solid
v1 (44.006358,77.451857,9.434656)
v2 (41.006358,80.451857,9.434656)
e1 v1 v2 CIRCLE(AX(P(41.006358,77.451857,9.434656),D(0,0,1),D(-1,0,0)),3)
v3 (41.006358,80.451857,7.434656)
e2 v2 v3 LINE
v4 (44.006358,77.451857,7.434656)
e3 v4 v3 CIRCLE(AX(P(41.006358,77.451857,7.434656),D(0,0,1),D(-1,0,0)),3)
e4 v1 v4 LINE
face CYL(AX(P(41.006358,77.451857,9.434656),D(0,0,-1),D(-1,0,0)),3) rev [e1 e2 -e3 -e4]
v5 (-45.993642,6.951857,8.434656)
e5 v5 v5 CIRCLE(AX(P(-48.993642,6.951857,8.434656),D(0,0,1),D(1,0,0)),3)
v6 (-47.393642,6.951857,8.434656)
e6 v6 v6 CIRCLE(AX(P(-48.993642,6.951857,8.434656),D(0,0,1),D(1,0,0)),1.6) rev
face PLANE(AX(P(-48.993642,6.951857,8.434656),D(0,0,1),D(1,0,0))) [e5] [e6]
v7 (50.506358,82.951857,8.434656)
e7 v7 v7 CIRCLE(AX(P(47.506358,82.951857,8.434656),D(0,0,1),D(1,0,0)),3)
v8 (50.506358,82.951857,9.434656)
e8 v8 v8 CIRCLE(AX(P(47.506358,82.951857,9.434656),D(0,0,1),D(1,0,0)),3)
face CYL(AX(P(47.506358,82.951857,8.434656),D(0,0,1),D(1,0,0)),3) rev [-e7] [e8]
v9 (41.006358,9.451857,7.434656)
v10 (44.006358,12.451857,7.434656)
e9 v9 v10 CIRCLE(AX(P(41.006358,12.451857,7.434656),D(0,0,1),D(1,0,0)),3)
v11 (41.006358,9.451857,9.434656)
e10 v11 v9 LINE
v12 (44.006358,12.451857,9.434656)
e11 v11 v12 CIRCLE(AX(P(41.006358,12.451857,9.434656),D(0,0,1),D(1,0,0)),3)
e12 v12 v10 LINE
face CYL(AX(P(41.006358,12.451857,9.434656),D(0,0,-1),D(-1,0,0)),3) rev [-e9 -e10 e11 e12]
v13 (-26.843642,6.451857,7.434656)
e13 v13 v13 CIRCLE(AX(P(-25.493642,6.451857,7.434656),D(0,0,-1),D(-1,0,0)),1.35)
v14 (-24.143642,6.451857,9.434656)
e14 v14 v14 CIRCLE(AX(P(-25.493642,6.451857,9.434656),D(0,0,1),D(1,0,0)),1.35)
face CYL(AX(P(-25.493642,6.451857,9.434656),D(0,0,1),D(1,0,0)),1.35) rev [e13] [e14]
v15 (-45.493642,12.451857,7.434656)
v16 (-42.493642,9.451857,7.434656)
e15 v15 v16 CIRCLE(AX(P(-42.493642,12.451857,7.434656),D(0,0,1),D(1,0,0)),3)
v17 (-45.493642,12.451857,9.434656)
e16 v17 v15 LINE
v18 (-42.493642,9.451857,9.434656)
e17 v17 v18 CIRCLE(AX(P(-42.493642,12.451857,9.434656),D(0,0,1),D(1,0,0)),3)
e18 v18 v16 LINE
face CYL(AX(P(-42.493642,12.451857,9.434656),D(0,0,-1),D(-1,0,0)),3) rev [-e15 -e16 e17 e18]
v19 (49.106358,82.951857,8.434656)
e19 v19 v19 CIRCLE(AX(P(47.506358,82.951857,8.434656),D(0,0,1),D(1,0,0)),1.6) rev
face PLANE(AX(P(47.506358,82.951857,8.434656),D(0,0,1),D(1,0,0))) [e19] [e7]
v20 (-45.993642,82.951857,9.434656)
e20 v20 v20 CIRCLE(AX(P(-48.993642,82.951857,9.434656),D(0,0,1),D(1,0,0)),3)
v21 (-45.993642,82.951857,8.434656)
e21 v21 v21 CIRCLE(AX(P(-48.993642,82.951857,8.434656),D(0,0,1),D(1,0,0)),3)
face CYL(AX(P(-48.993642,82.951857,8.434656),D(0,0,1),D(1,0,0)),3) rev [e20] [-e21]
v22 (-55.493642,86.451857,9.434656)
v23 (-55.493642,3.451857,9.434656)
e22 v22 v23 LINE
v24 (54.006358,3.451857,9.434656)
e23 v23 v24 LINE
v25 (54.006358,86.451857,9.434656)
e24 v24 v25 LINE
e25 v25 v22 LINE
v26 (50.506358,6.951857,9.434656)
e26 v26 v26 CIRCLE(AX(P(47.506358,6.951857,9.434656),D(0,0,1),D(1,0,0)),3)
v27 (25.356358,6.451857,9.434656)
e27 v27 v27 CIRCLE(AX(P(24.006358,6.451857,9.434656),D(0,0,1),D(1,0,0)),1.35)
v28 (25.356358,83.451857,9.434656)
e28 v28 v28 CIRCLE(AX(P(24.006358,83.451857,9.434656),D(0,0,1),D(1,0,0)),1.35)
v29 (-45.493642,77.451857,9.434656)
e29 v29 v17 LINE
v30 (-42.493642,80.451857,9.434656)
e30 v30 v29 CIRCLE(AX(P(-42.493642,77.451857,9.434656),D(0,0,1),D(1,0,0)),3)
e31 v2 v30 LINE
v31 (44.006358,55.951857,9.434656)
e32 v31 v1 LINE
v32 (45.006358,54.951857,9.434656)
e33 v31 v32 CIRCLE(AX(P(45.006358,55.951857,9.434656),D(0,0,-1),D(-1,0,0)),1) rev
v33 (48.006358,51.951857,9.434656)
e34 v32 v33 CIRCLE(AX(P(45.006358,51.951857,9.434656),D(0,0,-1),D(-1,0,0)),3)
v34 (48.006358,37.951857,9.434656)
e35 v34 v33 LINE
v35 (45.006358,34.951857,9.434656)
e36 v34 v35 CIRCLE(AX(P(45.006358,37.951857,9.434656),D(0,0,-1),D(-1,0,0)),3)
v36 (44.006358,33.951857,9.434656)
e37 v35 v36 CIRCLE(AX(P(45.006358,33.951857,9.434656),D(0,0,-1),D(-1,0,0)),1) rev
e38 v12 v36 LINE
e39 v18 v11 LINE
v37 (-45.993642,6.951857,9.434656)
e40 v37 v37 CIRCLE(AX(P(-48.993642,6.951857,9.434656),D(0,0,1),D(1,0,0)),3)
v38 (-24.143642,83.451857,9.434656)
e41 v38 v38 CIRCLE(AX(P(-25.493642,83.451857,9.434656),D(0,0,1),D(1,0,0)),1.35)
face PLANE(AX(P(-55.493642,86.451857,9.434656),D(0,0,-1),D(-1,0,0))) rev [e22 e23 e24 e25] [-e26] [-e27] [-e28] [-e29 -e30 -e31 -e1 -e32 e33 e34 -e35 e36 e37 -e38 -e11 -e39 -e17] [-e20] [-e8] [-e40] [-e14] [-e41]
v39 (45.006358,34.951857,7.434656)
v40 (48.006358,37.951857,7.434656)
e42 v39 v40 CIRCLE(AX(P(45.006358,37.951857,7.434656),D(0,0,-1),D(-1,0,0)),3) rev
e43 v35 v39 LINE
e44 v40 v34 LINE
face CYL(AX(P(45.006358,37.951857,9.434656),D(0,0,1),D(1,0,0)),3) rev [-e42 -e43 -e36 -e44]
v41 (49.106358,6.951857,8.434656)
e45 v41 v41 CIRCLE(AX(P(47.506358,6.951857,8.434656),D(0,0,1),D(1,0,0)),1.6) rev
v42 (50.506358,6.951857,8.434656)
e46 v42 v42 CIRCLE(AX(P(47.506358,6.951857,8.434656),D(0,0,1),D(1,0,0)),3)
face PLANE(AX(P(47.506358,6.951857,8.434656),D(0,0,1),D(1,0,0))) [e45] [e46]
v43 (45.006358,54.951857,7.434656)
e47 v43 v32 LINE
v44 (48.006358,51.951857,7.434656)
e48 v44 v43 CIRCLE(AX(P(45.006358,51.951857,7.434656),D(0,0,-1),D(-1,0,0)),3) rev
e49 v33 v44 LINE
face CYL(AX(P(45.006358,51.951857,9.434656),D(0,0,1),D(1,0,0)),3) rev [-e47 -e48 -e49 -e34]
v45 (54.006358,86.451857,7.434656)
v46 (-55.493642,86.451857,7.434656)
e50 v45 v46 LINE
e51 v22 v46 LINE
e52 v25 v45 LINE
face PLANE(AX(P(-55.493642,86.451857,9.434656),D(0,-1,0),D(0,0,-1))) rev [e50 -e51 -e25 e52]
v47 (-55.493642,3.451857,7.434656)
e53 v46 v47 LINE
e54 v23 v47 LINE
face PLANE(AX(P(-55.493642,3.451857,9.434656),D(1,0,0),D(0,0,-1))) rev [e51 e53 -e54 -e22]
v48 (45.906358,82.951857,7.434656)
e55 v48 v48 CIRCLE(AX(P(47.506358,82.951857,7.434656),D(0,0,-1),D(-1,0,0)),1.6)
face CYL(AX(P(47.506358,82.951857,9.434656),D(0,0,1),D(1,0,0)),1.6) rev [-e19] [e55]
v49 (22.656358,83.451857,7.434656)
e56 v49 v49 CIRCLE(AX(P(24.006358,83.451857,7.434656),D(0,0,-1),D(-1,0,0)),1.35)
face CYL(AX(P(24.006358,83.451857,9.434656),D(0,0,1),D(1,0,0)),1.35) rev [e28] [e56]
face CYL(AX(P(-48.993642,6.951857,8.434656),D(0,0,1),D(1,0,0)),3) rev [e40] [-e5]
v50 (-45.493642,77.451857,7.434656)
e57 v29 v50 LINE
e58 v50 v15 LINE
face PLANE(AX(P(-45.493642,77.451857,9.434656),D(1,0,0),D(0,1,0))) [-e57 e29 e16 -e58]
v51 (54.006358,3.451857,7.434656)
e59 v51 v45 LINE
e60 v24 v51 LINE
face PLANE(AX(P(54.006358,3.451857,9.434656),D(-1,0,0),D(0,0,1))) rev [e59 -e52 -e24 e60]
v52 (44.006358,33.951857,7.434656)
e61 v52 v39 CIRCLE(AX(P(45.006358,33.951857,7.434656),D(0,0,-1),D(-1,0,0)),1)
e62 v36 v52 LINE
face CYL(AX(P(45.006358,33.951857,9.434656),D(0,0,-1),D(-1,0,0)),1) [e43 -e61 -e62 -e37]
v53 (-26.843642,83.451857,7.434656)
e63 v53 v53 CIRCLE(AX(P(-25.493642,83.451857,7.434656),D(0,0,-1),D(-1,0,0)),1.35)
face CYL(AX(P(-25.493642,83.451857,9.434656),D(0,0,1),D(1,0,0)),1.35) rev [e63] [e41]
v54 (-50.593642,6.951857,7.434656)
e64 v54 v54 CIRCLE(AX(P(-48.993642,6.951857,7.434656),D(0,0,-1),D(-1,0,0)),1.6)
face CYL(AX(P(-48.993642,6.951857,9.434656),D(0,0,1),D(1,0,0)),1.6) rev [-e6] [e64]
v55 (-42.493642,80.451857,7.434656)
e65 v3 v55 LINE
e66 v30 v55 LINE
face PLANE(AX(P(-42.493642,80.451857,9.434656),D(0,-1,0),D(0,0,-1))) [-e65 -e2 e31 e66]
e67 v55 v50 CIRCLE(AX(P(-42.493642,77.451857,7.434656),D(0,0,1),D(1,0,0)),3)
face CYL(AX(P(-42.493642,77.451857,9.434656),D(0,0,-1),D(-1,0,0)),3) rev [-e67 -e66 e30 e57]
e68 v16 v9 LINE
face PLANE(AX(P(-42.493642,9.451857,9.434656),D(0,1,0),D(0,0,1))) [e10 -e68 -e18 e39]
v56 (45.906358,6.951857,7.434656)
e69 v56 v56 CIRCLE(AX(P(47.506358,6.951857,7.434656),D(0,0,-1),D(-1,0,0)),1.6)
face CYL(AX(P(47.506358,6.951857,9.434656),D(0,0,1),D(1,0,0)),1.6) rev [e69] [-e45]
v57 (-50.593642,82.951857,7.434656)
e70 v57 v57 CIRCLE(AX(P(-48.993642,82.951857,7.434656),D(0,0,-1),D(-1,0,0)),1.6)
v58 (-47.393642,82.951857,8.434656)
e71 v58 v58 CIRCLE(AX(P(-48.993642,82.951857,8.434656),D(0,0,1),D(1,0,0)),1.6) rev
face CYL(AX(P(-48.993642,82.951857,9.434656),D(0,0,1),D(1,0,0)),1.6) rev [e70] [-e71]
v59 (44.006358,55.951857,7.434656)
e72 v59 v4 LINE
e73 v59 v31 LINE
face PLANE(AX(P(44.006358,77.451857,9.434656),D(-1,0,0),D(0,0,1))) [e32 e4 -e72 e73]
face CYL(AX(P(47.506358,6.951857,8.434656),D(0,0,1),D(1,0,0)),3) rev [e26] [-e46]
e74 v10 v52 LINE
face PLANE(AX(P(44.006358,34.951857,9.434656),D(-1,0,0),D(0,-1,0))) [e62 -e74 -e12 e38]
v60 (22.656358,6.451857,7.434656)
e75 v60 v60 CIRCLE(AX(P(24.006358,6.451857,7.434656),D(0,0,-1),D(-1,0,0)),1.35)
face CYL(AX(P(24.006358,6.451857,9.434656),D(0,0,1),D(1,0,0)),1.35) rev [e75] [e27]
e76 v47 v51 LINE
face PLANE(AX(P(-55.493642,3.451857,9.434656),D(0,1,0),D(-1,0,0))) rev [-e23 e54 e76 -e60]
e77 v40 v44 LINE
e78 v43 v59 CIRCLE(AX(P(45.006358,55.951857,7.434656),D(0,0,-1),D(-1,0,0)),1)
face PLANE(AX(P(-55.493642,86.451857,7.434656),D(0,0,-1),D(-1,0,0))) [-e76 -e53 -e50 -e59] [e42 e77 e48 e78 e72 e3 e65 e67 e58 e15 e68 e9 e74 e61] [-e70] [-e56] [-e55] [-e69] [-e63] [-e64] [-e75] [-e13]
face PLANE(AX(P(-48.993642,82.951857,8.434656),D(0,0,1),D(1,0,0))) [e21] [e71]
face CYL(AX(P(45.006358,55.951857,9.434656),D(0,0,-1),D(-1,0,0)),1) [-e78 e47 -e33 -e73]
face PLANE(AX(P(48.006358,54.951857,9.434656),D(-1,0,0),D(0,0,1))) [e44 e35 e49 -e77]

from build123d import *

# Parameters (mm, degrees)
SKETCH1_W                  = 109.5
SKETCH1_H                  = 83
BOSS_EXTRUDE1_DEPTH        = 2
F_3_2_3_2_DIAMETER_HOLE1_D = 3.2
F_2_7_2_7_DIAMETER_HOLE1_D = 2.7
SKETCH12_R                 = 3
CUT_EXTRUDE1_DEPTH         = 1
FILLET1_R                  = 3
FILLET2_R                  = 1


with BuildPart() as part:
    # Sketch1 → Boss-Extrude1 (new body)
    with BuildSketch(Plane.XY.offset(7.43465612)):
        with Locations((-0.743641502, 44.95185693)):
            Rectangle(SKETCH1_W, SKETCH1_H)
        with BuildLine():
            Line((-42.493641502, 80.45185693), (41.006358498, 80.45185693))
            ThreePointArc((41.006358498, 80.45185693), (43.127678842, 79.573177274), (44.006358498, 77.45185693))
            Line((44.006358498, 77.45185693), (44.006358498, 54.95185693))
            Line((44.006358498, 54.95185693), (48.006358498, 54.95185693))
            Line((48.006358498, 54.95185693), (48.006358498, 44.95185693))
            Line((48.006358498, 44.95185693), (48.006358498, 34.95185693))
            Line((48.006358498, 34.95185693), (44.006358498, 34.95185693))
            Line((44.006358498, 34.95185693), (44.006358498, 12.45185693))
            ThreePointArc((44.006358498, 12.45185693), (43.127678842, 10.330536587), (41.006358498, 9.45185693))
            Line((41.006358498, 9.45185693), (-42.493641502, 9.45185693))
            ThreePointArc((-42.493641502, 9.45185693), (-44.614961845, 10.330536587), (-45.493641502, 12.45185693))
            Line((-45.493641502, 12.45185693), (-45.493641502, 77.45185693))
            ThreePointArc((-45.493641502, 77.45185693), (-44.614961845, 79.573177274), (-42.493641502, 80.45185693))
        make_face(mode=Mode.SUBTRACT)
    extrude(amount=BOSS_EXTRUDE1_DEPTH)

    # Ø3.2 (3.2) Diameter Hole1 (through all)
    with Locations(Plane.XY.offset(9.43465612)):
        with Locations((-48.993641502, 6.95185693), (-48.993641502, 82.95185693), (47.506358498, 82.95185693), (47.506358498, 6.95185693)):
            Hole(F_3_2_3_2_DIAMETER_HOLE1_D / 2)

    # Ø2.7 (2.7) Diameter Hole1 (through all)
    with Locations(Plane(origin=(-25.493641502, 83.45185693, 9.43465612), x_dir=(1, 0, 0), z_dir=(0, 0, 1))):
        with Locations((0, 0), (49.5, 0), (49.5, -77), (0, -77)):
            Hole(F_2_7_2_7_DIAMETER_HOLE1_D / 2)

    # Sketch12 → Cut-Extrude1 (cut)
    with BuildSketch(Plane.XY.offset(9.43465612)):
        with Locations((-48.993641502, 82.95185693)):
            Circle(SKETCH12_R)
        with Locations((47.506358498, 82.95185693)):
            Circle(SKETCH12_R)
        with Locations((47.506358498, 6.95185693)):
            Circle(SKETCH12_R)
        with Locations((-48.993641502, 6.95185693)):
            Circle(SKETCH12_R)
    extrude(amount=-CUT_EXTRUDE1_DEPTH, mode=Mode.SUBTRACT)

    # Fillet1
    fillet1_edges = [part.edges().sort_by_distance(p)[0] for p in [
        (48.006358498, 34.95185693, 8.43465612),
        (48.006358498, 54.95185693, 8.43465612),
    ]]
    fillet(fillet1_edges, radius=FILLET1_R)

    # Fillet2
    fillet2_edges = [part.edges().sort_by_distance(p)[0] for p in [
        (44.006358498, 34.95185693, 8.43465612),
        (44.006358498, 54.95185693, 8.43465612),
    ]]
    fillet(fillet2_edges, radius=FILLET2_R - 0.0001)  # a hair under: the kernel refuses the full size


solid = part.part
